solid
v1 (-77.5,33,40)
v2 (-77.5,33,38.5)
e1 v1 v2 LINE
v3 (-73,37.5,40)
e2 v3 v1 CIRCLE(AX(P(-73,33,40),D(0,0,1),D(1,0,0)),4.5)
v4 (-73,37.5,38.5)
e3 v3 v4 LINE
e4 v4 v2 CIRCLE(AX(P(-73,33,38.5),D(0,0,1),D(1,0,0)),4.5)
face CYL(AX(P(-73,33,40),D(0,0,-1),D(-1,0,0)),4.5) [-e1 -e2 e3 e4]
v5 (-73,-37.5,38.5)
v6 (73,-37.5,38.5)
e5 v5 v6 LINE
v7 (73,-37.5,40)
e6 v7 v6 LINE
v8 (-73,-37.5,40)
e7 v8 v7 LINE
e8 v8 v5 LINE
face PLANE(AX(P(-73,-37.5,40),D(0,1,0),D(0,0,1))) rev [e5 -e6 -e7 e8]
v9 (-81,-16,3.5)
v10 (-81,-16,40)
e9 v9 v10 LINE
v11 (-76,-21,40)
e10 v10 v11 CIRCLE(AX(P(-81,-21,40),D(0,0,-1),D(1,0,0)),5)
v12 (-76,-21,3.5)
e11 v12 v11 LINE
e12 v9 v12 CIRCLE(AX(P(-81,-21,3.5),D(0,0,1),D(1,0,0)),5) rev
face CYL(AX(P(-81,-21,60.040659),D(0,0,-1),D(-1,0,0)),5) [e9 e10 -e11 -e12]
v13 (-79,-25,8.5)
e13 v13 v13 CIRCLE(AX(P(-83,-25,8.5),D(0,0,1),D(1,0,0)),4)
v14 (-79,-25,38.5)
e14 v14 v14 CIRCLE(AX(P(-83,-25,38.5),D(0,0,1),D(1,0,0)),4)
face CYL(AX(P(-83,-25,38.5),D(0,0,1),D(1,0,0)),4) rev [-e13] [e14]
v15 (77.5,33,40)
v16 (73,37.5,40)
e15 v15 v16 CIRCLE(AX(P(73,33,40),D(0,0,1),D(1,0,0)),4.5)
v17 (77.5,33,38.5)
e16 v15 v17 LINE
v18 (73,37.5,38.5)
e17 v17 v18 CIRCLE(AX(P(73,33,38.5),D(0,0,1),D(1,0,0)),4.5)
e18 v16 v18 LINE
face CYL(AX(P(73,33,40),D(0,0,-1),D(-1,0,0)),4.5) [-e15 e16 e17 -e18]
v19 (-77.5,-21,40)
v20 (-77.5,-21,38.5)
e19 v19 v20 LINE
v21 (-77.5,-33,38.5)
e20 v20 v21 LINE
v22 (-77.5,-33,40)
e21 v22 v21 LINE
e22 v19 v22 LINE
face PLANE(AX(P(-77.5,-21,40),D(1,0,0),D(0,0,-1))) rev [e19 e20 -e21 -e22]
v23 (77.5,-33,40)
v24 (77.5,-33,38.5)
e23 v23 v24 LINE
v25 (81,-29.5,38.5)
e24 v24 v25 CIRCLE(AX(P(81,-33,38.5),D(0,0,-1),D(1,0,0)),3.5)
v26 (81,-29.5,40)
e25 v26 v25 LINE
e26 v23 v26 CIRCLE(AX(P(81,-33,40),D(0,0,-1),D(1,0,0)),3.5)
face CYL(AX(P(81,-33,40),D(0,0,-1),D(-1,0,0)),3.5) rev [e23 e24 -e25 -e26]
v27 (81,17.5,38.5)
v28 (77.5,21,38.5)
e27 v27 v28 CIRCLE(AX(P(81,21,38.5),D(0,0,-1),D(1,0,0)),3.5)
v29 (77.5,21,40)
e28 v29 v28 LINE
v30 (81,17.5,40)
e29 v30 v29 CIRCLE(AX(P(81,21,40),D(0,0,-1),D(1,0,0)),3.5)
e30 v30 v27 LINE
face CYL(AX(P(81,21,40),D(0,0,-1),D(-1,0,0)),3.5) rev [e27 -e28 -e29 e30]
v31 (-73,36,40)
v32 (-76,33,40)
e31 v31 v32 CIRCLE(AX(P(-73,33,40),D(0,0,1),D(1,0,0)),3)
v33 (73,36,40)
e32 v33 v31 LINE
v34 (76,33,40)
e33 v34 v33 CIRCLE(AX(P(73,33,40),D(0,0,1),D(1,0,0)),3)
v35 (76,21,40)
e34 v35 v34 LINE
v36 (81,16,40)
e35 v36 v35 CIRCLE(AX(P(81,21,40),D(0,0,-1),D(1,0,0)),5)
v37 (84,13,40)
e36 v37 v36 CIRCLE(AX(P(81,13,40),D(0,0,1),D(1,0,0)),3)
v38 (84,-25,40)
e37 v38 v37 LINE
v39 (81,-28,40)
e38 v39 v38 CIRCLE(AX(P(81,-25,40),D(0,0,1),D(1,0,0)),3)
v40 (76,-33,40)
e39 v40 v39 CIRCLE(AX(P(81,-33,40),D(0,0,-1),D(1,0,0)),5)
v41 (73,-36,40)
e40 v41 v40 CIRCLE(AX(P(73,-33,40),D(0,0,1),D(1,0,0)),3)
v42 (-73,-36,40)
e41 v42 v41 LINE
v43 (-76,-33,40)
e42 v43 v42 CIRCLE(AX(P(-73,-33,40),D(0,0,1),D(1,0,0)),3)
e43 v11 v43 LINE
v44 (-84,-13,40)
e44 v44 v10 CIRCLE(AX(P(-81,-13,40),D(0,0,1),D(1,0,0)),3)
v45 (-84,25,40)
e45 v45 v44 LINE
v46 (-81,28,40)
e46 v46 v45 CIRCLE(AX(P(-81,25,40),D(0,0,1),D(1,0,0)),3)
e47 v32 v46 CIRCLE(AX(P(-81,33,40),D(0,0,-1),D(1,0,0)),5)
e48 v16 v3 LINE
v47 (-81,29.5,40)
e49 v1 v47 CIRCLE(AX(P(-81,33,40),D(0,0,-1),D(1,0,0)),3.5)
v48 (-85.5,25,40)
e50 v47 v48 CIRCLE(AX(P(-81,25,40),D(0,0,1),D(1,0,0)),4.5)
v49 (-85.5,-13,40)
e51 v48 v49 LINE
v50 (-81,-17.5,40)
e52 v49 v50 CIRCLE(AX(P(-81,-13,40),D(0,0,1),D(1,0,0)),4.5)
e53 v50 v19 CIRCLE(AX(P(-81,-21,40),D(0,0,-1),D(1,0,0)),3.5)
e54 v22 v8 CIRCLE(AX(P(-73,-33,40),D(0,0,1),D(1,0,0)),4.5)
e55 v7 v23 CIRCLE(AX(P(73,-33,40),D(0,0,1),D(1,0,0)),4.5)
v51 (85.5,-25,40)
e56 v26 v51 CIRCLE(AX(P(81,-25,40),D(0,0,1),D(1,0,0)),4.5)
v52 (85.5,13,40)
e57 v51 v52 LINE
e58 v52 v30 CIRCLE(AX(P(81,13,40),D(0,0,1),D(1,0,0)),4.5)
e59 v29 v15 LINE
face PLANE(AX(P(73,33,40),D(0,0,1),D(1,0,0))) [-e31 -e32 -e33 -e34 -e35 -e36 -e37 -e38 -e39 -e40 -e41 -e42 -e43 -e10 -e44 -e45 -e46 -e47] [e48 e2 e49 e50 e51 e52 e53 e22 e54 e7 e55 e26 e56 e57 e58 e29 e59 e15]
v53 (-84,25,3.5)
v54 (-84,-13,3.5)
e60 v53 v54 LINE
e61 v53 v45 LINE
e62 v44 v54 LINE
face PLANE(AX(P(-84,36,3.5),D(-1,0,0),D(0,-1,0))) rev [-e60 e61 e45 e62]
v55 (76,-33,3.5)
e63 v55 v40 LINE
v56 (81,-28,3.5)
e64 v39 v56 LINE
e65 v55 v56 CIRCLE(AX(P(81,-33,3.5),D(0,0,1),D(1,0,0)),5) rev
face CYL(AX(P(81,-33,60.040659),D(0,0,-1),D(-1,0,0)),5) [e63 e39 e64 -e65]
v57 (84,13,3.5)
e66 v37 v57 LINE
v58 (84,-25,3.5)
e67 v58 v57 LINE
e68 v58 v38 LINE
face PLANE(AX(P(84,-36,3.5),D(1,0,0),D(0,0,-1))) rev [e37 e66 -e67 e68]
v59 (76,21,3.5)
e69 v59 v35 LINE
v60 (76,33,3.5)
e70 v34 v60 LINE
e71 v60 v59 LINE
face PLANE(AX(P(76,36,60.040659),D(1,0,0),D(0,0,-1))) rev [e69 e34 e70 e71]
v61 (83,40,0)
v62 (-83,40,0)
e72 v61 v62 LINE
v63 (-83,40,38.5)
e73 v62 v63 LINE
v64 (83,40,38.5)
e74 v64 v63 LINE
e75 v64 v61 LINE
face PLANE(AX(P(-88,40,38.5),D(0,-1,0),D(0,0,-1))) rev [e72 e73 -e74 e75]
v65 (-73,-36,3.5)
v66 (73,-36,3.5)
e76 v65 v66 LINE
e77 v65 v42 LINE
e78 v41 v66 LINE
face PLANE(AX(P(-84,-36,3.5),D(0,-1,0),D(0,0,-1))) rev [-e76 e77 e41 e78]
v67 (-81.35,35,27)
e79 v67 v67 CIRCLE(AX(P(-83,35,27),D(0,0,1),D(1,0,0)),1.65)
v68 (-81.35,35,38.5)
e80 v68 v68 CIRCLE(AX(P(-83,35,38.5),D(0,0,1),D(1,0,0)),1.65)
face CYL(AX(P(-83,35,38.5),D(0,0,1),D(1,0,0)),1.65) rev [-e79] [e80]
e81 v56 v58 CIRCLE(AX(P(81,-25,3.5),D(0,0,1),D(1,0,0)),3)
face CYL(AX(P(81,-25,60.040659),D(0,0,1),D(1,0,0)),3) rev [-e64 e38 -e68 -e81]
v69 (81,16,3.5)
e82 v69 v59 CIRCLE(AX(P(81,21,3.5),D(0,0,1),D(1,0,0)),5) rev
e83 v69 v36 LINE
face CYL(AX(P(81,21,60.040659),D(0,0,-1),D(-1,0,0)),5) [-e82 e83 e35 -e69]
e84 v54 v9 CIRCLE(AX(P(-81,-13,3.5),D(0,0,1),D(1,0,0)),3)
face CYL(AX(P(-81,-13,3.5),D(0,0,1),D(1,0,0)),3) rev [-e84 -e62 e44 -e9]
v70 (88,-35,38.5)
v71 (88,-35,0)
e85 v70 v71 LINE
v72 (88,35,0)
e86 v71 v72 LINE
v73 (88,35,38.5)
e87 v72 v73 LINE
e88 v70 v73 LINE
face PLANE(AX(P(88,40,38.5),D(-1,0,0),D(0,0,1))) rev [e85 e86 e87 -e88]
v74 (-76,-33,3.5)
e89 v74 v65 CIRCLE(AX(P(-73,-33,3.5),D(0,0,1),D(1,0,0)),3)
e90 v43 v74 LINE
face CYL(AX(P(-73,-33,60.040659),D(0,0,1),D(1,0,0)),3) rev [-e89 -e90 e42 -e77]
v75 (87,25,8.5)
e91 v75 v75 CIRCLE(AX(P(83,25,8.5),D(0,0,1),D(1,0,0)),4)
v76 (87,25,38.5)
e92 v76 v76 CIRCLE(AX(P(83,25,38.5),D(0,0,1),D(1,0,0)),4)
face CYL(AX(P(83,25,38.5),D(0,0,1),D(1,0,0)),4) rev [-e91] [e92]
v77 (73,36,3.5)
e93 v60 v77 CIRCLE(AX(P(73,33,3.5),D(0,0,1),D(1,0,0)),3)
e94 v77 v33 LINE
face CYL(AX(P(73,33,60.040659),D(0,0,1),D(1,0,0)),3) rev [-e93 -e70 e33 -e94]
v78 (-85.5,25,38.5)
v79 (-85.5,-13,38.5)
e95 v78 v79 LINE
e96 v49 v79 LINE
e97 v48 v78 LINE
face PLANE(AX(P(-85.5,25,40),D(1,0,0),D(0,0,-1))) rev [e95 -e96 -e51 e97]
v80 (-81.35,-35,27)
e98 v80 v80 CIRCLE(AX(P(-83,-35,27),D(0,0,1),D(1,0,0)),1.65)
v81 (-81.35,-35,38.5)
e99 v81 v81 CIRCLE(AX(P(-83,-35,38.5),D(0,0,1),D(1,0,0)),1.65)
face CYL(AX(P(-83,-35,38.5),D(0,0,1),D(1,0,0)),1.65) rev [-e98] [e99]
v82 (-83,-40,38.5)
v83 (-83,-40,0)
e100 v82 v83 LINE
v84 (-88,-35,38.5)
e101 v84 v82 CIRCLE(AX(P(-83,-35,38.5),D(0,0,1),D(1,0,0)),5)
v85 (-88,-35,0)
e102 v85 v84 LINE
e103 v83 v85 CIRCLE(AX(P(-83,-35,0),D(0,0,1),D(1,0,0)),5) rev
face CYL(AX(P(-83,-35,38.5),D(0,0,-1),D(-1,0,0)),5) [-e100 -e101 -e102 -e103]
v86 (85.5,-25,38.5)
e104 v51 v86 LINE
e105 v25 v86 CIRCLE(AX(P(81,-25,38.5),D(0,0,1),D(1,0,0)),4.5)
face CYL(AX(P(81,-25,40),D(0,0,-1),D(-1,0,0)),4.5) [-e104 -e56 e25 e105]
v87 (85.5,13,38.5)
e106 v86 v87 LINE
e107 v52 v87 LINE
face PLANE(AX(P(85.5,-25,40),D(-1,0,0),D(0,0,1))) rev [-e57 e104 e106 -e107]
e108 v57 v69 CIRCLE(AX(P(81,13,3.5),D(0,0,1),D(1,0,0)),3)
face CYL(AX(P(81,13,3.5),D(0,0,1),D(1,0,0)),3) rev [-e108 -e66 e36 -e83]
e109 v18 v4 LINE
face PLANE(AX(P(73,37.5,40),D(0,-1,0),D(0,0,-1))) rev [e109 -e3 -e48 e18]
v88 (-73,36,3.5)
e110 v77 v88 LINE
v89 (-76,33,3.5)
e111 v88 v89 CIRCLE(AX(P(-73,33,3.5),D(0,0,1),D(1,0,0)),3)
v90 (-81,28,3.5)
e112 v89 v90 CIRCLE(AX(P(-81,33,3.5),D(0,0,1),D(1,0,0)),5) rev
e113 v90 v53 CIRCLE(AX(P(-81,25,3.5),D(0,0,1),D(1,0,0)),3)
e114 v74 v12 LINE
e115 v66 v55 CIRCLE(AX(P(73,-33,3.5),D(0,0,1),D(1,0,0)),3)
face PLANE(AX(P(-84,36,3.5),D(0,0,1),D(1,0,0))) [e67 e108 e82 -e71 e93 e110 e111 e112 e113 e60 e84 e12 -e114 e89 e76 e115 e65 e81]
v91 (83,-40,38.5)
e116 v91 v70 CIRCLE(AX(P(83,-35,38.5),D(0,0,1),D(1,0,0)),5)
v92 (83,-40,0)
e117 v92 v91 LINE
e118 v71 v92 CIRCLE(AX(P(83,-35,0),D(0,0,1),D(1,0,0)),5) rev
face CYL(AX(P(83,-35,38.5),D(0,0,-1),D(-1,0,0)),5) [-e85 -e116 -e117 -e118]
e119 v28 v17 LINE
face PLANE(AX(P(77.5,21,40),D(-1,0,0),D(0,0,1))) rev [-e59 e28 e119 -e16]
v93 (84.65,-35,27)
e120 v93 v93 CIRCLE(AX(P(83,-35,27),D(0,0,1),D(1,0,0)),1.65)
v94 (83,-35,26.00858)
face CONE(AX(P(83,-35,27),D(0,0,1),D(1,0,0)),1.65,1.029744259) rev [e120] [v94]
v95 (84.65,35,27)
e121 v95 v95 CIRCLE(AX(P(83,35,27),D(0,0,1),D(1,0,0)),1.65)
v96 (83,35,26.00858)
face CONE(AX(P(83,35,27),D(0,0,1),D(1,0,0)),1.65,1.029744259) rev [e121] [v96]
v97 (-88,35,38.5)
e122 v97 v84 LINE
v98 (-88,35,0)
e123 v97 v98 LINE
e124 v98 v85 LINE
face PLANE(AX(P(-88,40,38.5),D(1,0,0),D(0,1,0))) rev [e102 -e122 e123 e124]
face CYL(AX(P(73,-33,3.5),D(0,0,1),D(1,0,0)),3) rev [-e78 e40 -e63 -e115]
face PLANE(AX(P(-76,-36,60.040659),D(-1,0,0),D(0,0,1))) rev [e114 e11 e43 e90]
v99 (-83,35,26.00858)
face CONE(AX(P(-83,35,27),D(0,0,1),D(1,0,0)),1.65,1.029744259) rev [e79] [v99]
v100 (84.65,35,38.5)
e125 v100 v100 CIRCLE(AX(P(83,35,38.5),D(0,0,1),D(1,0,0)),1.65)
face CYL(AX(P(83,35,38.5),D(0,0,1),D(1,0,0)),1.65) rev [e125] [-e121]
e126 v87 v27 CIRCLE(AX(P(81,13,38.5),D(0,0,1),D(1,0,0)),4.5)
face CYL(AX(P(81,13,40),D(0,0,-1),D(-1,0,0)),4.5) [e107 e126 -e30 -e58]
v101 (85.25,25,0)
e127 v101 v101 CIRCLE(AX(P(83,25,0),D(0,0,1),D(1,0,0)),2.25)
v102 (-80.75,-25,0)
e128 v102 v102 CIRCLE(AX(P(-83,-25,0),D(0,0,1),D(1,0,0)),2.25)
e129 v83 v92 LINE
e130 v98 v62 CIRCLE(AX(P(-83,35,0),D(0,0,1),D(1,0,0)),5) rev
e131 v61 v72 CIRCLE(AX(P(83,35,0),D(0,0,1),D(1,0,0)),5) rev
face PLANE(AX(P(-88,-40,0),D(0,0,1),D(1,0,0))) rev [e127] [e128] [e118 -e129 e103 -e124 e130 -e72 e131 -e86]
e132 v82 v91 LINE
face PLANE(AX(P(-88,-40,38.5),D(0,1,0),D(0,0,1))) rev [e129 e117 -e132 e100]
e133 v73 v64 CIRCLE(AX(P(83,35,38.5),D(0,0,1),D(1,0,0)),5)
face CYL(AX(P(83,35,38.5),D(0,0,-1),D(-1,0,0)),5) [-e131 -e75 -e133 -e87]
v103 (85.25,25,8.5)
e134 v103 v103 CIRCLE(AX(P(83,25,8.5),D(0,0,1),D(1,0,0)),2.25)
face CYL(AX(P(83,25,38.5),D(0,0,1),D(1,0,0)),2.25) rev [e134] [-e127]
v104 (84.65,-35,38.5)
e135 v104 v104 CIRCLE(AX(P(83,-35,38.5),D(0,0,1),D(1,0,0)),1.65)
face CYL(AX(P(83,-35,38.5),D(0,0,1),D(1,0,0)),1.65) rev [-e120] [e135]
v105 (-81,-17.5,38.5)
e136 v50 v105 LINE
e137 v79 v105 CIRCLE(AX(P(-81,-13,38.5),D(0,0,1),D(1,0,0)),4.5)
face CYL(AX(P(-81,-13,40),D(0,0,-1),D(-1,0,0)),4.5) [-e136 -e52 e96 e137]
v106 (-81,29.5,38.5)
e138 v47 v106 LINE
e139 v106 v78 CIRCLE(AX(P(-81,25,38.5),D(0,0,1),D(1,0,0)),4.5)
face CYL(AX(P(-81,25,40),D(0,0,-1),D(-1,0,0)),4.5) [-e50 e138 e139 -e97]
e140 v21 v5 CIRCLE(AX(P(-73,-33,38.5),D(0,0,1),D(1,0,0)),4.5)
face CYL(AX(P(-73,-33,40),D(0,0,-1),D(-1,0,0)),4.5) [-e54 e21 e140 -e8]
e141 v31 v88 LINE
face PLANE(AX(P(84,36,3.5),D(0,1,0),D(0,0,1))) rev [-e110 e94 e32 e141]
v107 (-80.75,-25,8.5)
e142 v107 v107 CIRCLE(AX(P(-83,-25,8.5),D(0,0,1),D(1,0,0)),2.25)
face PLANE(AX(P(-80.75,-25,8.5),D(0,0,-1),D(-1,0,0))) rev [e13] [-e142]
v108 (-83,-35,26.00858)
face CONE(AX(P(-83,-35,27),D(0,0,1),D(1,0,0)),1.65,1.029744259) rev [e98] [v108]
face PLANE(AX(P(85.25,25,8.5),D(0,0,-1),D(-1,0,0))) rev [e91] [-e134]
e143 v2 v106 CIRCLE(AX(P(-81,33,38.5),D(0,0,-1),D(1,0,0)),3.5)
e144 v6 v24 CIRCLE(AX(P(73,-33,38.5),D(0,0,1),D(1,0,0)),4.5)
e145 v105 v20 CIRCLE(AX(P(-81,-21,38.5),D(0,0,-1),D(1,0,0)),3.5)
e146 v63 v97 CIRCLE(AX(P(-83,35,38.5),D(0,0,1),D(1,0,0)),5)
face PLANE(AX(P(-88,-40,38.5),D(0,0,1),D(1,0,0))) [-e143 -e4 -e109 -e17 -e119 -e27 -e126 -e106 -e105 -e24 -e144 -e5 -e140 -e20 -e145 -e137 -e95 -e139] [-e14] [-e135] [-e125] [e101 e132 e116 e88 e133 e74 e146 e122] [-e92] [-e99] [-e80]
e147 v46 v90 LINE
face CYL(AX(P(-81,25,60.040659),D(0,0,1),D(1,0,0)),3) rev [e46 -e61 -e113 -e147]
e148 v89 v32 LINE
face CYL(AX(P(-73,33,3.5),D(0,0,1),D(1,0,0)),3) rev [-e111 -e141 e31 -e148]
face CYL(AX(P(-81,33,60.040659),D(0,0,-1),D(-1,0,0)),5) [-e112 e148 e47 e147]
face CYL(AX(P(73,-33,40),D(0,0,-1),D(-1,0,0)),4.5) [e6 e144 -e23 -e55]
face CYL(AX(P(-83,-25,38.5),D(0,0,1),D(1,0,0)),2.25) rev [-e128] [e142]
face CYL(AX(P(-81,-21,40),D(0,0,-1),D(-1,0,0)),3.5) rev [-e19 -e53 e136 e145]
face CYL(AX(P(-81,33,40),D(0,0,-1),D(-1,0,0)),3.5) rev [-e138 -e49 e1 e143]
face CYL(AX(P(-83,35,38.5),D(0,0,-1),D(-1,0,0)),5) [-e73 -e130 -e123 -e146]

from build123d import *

# Parameters (mm, degrees)
SKETCH1_W                                   = 176
SKETCH1_H                                   = 80
BOSS_EXTRUDE1_DEPTH                         = 38.5
SKETCH2_W                                   = 168
SKETCH2_H                                   = 72
CUT_EXTRUDE1_DEPTH                          = 35
FILLET2_R                                   = 5
SKETCH8_W                                   = 8
SKETCH8_H                                   = 20
SKETCH8_H_2                                 = 8
BOSS_EXTRUDE2_DEPTH                         = 35
FILLET4_R                                   = 3
FILLET5_R                                   = 5
M4_TAPPED_HOLE1_D                           = 3.3
M4_TAPPED_HOLE1_DEPTH                       = 11.5
M4_TAPPED_HOLE1_TIP                         = 0.991420021
BOSS_EXTRUDE3_START                         = 1.5
BOSS_EXTRUDE3_DEPTH                         = 1.5
CBORE_FOR_M4_CHEESE_HEAD_SCREW1_D           = 4.5
CBORE_FOR_M4_CHEESE_HEAD_SCREW1_CBORE_D     = 8
CBORE_FOR_M4_CHEESE_HEAD_SCREW1_CBORE_DEPTH = 30


with BuildPart() as part:
    # Sketch1 → Boss-Extrude1 (new body)
    with BuildSketch(Plane.XY):
        Rectangle(SKETCH1_W, SKETCH1_H)
    extrude(amount=BOSS_EXTRUDE1_DEPTH)

    # Sketch2 → Cut-Extrude1 (cut)
    with BuildSketch(Plane.XY.offset(38.5)):
        Rectangle(SKETCH2_W, SKETCH2_H)
    extrude(amount=-CUT_EXTRUDE1_DEPTH, mode=Mode.SUBTRACT)

    # Fillet2
    fillet2_edges = [part.edges().sort_by_distance(p)[0] for p in [
        (-88, 40, 19.25),
        (88, 40, 19.25),
        (88, -40, 19.25),
        (-88, -40, 19.25),
    ]]
    fillet(fillet2_edges, radius=FILLET2_R)

    # Sketch8 → Boss-Extrude2 (add)
    with BuildSketch(Plane.XY.offset(3.5)):
        with Locations((80, 26)):
            Rectangle(SKETCH8_W, SKETCH8_H)
        with Locations((80, -32)):
            Rectangle(SKETCH8_W, SKETCH8_H_2)
        with Locations((-80, -26)):
            Rectangle(SKETCH8_W, SKETCH8_H)
        with Locations((-80, 32)):
            Rectangle(SKETCH8_W, SKETCH8_H_2)
    extrude(amount=BOSS_EXTRUDE2_DEPTH)

    # Fillet4
    fillet4_edges = [part.edges().sort_by_distance(p)[0] for p in [
        (76, 36, 21),
        (84, 16, 21),
        (84, -28, 21),
        (76, -36, 21),
        (-76, -36, 21),
        (-84, -16, 21),
        (-84, 28, 21),
        (-76, 36, 21),
    ]]
    fillet(fillet4_edges, radius=FILLET4_R)

    # Fillet5
    fillet5_edges = [part.edges().sort_by_distance(p)[0] for p in [
        (-76, -16, 21),
        (76, -28, 21),
        (76, 16, 21),
        (-76, 28, 21),
    ]]
    fillet(fillet5_edges, radius=FILLET5_R - 0.0001)  # a hair under: the kernel refuses the full size

    # M4 Tapped Hole1
    with Locations(Plane.XY.offset(38.5)):
        with Locations((-83, -35), (83, 35), (-83, 35), (83, -35)):
            Hole(M4_TAPPED_HOLE1_D / 2, depth=M4_TAPPED_HOLE1_DEPTH)
            with Locations((0, 0, -(M4_TAPPED_HOLE1_DEPTH + M4_TAPPED_HOLE1_TIP / 2))):  # 118° drill point
                Cone(0, M4_TAPPED_HOLE1_D / 2, M4_TAPPED_HOLE1_TIP, mode=Mode.SUBTRACT)

    # Sketch9 → Boss-Extrude3 (add)
    with BuildSketch(Plane.XY.offset(38.5).offset(BOSS_EXTRUDE3_START)):
        with BuildLine():
            Line((73, 37.5), (-73, 37.5))
            ThreePointArc((-73, 37.5), (-76.181980515, 36.181980515), (-77.5, 33))
            ThreePointArc((-77.5, 33), (-78.525126266, 30.525126266), (-81, 29.5))
            ThreePointArc((-81, 29.5), (-84.181980515, 28.181980515), (-85.5, 25))
            Line((-85.5, 25), (-85.5, -13))
            ThreePointArc((-85.5, -13), (-84.181980515, -16.181980515), (-81, -17.5))
            ThreePointArc((-81, -17.5), (-78.525126266, -18.525126266), (-77.5, -21))
            Line((-77.5, -21), (-77.5, -33))
            ThreePointArc((-77.5, -33), (-76.181980515, -36.181980515), (-73, -37.5))
            Line((-73, -37.5), (73, -37.5))
            ThreePointArc((73, -37.5), (76.181980515, -36.181980515), (77.5, -33))
            ThreePointArc((77.5, -33), (78.525126266, -30.525126266), (81, -29.5))
            ThreePointArc((81, -29.5), (84.181980515, -28.181980515), (85.5, -25))
            Line((85.5, -25), (85.5, 13))
            ThreePointArc((85.5, 13), (84.181980515, 16.181980515), (81, 17.5))
            ThreePointArc((81, 17.5), (78.525126266, 18.525126266), (77.5, 21))
            Line((77.5, 21), (77.5, 33))
            ThreePointArc((77.5, 33), (76.181980515, 36.181980515), (73, 37.5))
        make_face()
        with BuildLine():
            Line((73, 36), (-73, 36))
            ThreePointArc((-73, 36), (-75.121320344, 35.121320344), (-76, 33))
            ThreePointArc((-76, 33), (-77.464466094, 29.464466094), (-81, 28))
            ThreePointArc((-81, 28), (-83.121320344, 27.121320344), (-84, 25))
            Line((-84, 25), (-84, -13))
            ThreePointArc((-84, -13), (-83.121320344, -15.121320344), (-81, -16))
            ThreePointArc((-81, -16), (-77.464466094, -17.464466094), (-76, -21))
            Line((-76, -21), (-76, -33))
            ThreePointArc((-76, -33), (-75.121320344, -35.121320344), (-73, -36))
            Line((-73, -36), (73, -36))
            ThreePointArc((73, -36), (75.121320344, -35.121320344), (76, -33))
            ThreePointArc((76, -33), (77.464466094, -29.464466094), (81, -28))
            ThreePointArc((81, -28), (83.121320344, -27.121320344), (84, -25))
            Line((84, -25), (84, 13))
            ThreePointArc((84, 13), (83.121320344, 15.121320344), (81, 16))
            ThreePointArc((81, 16), (77.464466094, 17.464466094), (76, 21))
            Line((76, 21), (76, 33))
            ThreePointArc((76, 33), (75.121320344, 35.121320344), (73, 36))
        make_face(mode=Mode.SUBTRACT)
    extrude(amount=-BOSS_EXTRUDE3_DEPTH)

    # CBORE for M4 Cheese Head Screw1 (through all)
    with Locations(Plane.XY.offset(38.5)):
        with Locations((83, 25), (-83, -25)):
            CounterBoreHole(CBORE_FOR_M4_CHEESE_HEAD_SCREW1_D / 2, CBORE_FOR_M4_CHEESE_HEAD_SCREW1_CBORE_D / 2, CBORE_FOR_M4_CHEESE_HEAD_SCREW1_CBORE_DEPTH)


solid = part.part
